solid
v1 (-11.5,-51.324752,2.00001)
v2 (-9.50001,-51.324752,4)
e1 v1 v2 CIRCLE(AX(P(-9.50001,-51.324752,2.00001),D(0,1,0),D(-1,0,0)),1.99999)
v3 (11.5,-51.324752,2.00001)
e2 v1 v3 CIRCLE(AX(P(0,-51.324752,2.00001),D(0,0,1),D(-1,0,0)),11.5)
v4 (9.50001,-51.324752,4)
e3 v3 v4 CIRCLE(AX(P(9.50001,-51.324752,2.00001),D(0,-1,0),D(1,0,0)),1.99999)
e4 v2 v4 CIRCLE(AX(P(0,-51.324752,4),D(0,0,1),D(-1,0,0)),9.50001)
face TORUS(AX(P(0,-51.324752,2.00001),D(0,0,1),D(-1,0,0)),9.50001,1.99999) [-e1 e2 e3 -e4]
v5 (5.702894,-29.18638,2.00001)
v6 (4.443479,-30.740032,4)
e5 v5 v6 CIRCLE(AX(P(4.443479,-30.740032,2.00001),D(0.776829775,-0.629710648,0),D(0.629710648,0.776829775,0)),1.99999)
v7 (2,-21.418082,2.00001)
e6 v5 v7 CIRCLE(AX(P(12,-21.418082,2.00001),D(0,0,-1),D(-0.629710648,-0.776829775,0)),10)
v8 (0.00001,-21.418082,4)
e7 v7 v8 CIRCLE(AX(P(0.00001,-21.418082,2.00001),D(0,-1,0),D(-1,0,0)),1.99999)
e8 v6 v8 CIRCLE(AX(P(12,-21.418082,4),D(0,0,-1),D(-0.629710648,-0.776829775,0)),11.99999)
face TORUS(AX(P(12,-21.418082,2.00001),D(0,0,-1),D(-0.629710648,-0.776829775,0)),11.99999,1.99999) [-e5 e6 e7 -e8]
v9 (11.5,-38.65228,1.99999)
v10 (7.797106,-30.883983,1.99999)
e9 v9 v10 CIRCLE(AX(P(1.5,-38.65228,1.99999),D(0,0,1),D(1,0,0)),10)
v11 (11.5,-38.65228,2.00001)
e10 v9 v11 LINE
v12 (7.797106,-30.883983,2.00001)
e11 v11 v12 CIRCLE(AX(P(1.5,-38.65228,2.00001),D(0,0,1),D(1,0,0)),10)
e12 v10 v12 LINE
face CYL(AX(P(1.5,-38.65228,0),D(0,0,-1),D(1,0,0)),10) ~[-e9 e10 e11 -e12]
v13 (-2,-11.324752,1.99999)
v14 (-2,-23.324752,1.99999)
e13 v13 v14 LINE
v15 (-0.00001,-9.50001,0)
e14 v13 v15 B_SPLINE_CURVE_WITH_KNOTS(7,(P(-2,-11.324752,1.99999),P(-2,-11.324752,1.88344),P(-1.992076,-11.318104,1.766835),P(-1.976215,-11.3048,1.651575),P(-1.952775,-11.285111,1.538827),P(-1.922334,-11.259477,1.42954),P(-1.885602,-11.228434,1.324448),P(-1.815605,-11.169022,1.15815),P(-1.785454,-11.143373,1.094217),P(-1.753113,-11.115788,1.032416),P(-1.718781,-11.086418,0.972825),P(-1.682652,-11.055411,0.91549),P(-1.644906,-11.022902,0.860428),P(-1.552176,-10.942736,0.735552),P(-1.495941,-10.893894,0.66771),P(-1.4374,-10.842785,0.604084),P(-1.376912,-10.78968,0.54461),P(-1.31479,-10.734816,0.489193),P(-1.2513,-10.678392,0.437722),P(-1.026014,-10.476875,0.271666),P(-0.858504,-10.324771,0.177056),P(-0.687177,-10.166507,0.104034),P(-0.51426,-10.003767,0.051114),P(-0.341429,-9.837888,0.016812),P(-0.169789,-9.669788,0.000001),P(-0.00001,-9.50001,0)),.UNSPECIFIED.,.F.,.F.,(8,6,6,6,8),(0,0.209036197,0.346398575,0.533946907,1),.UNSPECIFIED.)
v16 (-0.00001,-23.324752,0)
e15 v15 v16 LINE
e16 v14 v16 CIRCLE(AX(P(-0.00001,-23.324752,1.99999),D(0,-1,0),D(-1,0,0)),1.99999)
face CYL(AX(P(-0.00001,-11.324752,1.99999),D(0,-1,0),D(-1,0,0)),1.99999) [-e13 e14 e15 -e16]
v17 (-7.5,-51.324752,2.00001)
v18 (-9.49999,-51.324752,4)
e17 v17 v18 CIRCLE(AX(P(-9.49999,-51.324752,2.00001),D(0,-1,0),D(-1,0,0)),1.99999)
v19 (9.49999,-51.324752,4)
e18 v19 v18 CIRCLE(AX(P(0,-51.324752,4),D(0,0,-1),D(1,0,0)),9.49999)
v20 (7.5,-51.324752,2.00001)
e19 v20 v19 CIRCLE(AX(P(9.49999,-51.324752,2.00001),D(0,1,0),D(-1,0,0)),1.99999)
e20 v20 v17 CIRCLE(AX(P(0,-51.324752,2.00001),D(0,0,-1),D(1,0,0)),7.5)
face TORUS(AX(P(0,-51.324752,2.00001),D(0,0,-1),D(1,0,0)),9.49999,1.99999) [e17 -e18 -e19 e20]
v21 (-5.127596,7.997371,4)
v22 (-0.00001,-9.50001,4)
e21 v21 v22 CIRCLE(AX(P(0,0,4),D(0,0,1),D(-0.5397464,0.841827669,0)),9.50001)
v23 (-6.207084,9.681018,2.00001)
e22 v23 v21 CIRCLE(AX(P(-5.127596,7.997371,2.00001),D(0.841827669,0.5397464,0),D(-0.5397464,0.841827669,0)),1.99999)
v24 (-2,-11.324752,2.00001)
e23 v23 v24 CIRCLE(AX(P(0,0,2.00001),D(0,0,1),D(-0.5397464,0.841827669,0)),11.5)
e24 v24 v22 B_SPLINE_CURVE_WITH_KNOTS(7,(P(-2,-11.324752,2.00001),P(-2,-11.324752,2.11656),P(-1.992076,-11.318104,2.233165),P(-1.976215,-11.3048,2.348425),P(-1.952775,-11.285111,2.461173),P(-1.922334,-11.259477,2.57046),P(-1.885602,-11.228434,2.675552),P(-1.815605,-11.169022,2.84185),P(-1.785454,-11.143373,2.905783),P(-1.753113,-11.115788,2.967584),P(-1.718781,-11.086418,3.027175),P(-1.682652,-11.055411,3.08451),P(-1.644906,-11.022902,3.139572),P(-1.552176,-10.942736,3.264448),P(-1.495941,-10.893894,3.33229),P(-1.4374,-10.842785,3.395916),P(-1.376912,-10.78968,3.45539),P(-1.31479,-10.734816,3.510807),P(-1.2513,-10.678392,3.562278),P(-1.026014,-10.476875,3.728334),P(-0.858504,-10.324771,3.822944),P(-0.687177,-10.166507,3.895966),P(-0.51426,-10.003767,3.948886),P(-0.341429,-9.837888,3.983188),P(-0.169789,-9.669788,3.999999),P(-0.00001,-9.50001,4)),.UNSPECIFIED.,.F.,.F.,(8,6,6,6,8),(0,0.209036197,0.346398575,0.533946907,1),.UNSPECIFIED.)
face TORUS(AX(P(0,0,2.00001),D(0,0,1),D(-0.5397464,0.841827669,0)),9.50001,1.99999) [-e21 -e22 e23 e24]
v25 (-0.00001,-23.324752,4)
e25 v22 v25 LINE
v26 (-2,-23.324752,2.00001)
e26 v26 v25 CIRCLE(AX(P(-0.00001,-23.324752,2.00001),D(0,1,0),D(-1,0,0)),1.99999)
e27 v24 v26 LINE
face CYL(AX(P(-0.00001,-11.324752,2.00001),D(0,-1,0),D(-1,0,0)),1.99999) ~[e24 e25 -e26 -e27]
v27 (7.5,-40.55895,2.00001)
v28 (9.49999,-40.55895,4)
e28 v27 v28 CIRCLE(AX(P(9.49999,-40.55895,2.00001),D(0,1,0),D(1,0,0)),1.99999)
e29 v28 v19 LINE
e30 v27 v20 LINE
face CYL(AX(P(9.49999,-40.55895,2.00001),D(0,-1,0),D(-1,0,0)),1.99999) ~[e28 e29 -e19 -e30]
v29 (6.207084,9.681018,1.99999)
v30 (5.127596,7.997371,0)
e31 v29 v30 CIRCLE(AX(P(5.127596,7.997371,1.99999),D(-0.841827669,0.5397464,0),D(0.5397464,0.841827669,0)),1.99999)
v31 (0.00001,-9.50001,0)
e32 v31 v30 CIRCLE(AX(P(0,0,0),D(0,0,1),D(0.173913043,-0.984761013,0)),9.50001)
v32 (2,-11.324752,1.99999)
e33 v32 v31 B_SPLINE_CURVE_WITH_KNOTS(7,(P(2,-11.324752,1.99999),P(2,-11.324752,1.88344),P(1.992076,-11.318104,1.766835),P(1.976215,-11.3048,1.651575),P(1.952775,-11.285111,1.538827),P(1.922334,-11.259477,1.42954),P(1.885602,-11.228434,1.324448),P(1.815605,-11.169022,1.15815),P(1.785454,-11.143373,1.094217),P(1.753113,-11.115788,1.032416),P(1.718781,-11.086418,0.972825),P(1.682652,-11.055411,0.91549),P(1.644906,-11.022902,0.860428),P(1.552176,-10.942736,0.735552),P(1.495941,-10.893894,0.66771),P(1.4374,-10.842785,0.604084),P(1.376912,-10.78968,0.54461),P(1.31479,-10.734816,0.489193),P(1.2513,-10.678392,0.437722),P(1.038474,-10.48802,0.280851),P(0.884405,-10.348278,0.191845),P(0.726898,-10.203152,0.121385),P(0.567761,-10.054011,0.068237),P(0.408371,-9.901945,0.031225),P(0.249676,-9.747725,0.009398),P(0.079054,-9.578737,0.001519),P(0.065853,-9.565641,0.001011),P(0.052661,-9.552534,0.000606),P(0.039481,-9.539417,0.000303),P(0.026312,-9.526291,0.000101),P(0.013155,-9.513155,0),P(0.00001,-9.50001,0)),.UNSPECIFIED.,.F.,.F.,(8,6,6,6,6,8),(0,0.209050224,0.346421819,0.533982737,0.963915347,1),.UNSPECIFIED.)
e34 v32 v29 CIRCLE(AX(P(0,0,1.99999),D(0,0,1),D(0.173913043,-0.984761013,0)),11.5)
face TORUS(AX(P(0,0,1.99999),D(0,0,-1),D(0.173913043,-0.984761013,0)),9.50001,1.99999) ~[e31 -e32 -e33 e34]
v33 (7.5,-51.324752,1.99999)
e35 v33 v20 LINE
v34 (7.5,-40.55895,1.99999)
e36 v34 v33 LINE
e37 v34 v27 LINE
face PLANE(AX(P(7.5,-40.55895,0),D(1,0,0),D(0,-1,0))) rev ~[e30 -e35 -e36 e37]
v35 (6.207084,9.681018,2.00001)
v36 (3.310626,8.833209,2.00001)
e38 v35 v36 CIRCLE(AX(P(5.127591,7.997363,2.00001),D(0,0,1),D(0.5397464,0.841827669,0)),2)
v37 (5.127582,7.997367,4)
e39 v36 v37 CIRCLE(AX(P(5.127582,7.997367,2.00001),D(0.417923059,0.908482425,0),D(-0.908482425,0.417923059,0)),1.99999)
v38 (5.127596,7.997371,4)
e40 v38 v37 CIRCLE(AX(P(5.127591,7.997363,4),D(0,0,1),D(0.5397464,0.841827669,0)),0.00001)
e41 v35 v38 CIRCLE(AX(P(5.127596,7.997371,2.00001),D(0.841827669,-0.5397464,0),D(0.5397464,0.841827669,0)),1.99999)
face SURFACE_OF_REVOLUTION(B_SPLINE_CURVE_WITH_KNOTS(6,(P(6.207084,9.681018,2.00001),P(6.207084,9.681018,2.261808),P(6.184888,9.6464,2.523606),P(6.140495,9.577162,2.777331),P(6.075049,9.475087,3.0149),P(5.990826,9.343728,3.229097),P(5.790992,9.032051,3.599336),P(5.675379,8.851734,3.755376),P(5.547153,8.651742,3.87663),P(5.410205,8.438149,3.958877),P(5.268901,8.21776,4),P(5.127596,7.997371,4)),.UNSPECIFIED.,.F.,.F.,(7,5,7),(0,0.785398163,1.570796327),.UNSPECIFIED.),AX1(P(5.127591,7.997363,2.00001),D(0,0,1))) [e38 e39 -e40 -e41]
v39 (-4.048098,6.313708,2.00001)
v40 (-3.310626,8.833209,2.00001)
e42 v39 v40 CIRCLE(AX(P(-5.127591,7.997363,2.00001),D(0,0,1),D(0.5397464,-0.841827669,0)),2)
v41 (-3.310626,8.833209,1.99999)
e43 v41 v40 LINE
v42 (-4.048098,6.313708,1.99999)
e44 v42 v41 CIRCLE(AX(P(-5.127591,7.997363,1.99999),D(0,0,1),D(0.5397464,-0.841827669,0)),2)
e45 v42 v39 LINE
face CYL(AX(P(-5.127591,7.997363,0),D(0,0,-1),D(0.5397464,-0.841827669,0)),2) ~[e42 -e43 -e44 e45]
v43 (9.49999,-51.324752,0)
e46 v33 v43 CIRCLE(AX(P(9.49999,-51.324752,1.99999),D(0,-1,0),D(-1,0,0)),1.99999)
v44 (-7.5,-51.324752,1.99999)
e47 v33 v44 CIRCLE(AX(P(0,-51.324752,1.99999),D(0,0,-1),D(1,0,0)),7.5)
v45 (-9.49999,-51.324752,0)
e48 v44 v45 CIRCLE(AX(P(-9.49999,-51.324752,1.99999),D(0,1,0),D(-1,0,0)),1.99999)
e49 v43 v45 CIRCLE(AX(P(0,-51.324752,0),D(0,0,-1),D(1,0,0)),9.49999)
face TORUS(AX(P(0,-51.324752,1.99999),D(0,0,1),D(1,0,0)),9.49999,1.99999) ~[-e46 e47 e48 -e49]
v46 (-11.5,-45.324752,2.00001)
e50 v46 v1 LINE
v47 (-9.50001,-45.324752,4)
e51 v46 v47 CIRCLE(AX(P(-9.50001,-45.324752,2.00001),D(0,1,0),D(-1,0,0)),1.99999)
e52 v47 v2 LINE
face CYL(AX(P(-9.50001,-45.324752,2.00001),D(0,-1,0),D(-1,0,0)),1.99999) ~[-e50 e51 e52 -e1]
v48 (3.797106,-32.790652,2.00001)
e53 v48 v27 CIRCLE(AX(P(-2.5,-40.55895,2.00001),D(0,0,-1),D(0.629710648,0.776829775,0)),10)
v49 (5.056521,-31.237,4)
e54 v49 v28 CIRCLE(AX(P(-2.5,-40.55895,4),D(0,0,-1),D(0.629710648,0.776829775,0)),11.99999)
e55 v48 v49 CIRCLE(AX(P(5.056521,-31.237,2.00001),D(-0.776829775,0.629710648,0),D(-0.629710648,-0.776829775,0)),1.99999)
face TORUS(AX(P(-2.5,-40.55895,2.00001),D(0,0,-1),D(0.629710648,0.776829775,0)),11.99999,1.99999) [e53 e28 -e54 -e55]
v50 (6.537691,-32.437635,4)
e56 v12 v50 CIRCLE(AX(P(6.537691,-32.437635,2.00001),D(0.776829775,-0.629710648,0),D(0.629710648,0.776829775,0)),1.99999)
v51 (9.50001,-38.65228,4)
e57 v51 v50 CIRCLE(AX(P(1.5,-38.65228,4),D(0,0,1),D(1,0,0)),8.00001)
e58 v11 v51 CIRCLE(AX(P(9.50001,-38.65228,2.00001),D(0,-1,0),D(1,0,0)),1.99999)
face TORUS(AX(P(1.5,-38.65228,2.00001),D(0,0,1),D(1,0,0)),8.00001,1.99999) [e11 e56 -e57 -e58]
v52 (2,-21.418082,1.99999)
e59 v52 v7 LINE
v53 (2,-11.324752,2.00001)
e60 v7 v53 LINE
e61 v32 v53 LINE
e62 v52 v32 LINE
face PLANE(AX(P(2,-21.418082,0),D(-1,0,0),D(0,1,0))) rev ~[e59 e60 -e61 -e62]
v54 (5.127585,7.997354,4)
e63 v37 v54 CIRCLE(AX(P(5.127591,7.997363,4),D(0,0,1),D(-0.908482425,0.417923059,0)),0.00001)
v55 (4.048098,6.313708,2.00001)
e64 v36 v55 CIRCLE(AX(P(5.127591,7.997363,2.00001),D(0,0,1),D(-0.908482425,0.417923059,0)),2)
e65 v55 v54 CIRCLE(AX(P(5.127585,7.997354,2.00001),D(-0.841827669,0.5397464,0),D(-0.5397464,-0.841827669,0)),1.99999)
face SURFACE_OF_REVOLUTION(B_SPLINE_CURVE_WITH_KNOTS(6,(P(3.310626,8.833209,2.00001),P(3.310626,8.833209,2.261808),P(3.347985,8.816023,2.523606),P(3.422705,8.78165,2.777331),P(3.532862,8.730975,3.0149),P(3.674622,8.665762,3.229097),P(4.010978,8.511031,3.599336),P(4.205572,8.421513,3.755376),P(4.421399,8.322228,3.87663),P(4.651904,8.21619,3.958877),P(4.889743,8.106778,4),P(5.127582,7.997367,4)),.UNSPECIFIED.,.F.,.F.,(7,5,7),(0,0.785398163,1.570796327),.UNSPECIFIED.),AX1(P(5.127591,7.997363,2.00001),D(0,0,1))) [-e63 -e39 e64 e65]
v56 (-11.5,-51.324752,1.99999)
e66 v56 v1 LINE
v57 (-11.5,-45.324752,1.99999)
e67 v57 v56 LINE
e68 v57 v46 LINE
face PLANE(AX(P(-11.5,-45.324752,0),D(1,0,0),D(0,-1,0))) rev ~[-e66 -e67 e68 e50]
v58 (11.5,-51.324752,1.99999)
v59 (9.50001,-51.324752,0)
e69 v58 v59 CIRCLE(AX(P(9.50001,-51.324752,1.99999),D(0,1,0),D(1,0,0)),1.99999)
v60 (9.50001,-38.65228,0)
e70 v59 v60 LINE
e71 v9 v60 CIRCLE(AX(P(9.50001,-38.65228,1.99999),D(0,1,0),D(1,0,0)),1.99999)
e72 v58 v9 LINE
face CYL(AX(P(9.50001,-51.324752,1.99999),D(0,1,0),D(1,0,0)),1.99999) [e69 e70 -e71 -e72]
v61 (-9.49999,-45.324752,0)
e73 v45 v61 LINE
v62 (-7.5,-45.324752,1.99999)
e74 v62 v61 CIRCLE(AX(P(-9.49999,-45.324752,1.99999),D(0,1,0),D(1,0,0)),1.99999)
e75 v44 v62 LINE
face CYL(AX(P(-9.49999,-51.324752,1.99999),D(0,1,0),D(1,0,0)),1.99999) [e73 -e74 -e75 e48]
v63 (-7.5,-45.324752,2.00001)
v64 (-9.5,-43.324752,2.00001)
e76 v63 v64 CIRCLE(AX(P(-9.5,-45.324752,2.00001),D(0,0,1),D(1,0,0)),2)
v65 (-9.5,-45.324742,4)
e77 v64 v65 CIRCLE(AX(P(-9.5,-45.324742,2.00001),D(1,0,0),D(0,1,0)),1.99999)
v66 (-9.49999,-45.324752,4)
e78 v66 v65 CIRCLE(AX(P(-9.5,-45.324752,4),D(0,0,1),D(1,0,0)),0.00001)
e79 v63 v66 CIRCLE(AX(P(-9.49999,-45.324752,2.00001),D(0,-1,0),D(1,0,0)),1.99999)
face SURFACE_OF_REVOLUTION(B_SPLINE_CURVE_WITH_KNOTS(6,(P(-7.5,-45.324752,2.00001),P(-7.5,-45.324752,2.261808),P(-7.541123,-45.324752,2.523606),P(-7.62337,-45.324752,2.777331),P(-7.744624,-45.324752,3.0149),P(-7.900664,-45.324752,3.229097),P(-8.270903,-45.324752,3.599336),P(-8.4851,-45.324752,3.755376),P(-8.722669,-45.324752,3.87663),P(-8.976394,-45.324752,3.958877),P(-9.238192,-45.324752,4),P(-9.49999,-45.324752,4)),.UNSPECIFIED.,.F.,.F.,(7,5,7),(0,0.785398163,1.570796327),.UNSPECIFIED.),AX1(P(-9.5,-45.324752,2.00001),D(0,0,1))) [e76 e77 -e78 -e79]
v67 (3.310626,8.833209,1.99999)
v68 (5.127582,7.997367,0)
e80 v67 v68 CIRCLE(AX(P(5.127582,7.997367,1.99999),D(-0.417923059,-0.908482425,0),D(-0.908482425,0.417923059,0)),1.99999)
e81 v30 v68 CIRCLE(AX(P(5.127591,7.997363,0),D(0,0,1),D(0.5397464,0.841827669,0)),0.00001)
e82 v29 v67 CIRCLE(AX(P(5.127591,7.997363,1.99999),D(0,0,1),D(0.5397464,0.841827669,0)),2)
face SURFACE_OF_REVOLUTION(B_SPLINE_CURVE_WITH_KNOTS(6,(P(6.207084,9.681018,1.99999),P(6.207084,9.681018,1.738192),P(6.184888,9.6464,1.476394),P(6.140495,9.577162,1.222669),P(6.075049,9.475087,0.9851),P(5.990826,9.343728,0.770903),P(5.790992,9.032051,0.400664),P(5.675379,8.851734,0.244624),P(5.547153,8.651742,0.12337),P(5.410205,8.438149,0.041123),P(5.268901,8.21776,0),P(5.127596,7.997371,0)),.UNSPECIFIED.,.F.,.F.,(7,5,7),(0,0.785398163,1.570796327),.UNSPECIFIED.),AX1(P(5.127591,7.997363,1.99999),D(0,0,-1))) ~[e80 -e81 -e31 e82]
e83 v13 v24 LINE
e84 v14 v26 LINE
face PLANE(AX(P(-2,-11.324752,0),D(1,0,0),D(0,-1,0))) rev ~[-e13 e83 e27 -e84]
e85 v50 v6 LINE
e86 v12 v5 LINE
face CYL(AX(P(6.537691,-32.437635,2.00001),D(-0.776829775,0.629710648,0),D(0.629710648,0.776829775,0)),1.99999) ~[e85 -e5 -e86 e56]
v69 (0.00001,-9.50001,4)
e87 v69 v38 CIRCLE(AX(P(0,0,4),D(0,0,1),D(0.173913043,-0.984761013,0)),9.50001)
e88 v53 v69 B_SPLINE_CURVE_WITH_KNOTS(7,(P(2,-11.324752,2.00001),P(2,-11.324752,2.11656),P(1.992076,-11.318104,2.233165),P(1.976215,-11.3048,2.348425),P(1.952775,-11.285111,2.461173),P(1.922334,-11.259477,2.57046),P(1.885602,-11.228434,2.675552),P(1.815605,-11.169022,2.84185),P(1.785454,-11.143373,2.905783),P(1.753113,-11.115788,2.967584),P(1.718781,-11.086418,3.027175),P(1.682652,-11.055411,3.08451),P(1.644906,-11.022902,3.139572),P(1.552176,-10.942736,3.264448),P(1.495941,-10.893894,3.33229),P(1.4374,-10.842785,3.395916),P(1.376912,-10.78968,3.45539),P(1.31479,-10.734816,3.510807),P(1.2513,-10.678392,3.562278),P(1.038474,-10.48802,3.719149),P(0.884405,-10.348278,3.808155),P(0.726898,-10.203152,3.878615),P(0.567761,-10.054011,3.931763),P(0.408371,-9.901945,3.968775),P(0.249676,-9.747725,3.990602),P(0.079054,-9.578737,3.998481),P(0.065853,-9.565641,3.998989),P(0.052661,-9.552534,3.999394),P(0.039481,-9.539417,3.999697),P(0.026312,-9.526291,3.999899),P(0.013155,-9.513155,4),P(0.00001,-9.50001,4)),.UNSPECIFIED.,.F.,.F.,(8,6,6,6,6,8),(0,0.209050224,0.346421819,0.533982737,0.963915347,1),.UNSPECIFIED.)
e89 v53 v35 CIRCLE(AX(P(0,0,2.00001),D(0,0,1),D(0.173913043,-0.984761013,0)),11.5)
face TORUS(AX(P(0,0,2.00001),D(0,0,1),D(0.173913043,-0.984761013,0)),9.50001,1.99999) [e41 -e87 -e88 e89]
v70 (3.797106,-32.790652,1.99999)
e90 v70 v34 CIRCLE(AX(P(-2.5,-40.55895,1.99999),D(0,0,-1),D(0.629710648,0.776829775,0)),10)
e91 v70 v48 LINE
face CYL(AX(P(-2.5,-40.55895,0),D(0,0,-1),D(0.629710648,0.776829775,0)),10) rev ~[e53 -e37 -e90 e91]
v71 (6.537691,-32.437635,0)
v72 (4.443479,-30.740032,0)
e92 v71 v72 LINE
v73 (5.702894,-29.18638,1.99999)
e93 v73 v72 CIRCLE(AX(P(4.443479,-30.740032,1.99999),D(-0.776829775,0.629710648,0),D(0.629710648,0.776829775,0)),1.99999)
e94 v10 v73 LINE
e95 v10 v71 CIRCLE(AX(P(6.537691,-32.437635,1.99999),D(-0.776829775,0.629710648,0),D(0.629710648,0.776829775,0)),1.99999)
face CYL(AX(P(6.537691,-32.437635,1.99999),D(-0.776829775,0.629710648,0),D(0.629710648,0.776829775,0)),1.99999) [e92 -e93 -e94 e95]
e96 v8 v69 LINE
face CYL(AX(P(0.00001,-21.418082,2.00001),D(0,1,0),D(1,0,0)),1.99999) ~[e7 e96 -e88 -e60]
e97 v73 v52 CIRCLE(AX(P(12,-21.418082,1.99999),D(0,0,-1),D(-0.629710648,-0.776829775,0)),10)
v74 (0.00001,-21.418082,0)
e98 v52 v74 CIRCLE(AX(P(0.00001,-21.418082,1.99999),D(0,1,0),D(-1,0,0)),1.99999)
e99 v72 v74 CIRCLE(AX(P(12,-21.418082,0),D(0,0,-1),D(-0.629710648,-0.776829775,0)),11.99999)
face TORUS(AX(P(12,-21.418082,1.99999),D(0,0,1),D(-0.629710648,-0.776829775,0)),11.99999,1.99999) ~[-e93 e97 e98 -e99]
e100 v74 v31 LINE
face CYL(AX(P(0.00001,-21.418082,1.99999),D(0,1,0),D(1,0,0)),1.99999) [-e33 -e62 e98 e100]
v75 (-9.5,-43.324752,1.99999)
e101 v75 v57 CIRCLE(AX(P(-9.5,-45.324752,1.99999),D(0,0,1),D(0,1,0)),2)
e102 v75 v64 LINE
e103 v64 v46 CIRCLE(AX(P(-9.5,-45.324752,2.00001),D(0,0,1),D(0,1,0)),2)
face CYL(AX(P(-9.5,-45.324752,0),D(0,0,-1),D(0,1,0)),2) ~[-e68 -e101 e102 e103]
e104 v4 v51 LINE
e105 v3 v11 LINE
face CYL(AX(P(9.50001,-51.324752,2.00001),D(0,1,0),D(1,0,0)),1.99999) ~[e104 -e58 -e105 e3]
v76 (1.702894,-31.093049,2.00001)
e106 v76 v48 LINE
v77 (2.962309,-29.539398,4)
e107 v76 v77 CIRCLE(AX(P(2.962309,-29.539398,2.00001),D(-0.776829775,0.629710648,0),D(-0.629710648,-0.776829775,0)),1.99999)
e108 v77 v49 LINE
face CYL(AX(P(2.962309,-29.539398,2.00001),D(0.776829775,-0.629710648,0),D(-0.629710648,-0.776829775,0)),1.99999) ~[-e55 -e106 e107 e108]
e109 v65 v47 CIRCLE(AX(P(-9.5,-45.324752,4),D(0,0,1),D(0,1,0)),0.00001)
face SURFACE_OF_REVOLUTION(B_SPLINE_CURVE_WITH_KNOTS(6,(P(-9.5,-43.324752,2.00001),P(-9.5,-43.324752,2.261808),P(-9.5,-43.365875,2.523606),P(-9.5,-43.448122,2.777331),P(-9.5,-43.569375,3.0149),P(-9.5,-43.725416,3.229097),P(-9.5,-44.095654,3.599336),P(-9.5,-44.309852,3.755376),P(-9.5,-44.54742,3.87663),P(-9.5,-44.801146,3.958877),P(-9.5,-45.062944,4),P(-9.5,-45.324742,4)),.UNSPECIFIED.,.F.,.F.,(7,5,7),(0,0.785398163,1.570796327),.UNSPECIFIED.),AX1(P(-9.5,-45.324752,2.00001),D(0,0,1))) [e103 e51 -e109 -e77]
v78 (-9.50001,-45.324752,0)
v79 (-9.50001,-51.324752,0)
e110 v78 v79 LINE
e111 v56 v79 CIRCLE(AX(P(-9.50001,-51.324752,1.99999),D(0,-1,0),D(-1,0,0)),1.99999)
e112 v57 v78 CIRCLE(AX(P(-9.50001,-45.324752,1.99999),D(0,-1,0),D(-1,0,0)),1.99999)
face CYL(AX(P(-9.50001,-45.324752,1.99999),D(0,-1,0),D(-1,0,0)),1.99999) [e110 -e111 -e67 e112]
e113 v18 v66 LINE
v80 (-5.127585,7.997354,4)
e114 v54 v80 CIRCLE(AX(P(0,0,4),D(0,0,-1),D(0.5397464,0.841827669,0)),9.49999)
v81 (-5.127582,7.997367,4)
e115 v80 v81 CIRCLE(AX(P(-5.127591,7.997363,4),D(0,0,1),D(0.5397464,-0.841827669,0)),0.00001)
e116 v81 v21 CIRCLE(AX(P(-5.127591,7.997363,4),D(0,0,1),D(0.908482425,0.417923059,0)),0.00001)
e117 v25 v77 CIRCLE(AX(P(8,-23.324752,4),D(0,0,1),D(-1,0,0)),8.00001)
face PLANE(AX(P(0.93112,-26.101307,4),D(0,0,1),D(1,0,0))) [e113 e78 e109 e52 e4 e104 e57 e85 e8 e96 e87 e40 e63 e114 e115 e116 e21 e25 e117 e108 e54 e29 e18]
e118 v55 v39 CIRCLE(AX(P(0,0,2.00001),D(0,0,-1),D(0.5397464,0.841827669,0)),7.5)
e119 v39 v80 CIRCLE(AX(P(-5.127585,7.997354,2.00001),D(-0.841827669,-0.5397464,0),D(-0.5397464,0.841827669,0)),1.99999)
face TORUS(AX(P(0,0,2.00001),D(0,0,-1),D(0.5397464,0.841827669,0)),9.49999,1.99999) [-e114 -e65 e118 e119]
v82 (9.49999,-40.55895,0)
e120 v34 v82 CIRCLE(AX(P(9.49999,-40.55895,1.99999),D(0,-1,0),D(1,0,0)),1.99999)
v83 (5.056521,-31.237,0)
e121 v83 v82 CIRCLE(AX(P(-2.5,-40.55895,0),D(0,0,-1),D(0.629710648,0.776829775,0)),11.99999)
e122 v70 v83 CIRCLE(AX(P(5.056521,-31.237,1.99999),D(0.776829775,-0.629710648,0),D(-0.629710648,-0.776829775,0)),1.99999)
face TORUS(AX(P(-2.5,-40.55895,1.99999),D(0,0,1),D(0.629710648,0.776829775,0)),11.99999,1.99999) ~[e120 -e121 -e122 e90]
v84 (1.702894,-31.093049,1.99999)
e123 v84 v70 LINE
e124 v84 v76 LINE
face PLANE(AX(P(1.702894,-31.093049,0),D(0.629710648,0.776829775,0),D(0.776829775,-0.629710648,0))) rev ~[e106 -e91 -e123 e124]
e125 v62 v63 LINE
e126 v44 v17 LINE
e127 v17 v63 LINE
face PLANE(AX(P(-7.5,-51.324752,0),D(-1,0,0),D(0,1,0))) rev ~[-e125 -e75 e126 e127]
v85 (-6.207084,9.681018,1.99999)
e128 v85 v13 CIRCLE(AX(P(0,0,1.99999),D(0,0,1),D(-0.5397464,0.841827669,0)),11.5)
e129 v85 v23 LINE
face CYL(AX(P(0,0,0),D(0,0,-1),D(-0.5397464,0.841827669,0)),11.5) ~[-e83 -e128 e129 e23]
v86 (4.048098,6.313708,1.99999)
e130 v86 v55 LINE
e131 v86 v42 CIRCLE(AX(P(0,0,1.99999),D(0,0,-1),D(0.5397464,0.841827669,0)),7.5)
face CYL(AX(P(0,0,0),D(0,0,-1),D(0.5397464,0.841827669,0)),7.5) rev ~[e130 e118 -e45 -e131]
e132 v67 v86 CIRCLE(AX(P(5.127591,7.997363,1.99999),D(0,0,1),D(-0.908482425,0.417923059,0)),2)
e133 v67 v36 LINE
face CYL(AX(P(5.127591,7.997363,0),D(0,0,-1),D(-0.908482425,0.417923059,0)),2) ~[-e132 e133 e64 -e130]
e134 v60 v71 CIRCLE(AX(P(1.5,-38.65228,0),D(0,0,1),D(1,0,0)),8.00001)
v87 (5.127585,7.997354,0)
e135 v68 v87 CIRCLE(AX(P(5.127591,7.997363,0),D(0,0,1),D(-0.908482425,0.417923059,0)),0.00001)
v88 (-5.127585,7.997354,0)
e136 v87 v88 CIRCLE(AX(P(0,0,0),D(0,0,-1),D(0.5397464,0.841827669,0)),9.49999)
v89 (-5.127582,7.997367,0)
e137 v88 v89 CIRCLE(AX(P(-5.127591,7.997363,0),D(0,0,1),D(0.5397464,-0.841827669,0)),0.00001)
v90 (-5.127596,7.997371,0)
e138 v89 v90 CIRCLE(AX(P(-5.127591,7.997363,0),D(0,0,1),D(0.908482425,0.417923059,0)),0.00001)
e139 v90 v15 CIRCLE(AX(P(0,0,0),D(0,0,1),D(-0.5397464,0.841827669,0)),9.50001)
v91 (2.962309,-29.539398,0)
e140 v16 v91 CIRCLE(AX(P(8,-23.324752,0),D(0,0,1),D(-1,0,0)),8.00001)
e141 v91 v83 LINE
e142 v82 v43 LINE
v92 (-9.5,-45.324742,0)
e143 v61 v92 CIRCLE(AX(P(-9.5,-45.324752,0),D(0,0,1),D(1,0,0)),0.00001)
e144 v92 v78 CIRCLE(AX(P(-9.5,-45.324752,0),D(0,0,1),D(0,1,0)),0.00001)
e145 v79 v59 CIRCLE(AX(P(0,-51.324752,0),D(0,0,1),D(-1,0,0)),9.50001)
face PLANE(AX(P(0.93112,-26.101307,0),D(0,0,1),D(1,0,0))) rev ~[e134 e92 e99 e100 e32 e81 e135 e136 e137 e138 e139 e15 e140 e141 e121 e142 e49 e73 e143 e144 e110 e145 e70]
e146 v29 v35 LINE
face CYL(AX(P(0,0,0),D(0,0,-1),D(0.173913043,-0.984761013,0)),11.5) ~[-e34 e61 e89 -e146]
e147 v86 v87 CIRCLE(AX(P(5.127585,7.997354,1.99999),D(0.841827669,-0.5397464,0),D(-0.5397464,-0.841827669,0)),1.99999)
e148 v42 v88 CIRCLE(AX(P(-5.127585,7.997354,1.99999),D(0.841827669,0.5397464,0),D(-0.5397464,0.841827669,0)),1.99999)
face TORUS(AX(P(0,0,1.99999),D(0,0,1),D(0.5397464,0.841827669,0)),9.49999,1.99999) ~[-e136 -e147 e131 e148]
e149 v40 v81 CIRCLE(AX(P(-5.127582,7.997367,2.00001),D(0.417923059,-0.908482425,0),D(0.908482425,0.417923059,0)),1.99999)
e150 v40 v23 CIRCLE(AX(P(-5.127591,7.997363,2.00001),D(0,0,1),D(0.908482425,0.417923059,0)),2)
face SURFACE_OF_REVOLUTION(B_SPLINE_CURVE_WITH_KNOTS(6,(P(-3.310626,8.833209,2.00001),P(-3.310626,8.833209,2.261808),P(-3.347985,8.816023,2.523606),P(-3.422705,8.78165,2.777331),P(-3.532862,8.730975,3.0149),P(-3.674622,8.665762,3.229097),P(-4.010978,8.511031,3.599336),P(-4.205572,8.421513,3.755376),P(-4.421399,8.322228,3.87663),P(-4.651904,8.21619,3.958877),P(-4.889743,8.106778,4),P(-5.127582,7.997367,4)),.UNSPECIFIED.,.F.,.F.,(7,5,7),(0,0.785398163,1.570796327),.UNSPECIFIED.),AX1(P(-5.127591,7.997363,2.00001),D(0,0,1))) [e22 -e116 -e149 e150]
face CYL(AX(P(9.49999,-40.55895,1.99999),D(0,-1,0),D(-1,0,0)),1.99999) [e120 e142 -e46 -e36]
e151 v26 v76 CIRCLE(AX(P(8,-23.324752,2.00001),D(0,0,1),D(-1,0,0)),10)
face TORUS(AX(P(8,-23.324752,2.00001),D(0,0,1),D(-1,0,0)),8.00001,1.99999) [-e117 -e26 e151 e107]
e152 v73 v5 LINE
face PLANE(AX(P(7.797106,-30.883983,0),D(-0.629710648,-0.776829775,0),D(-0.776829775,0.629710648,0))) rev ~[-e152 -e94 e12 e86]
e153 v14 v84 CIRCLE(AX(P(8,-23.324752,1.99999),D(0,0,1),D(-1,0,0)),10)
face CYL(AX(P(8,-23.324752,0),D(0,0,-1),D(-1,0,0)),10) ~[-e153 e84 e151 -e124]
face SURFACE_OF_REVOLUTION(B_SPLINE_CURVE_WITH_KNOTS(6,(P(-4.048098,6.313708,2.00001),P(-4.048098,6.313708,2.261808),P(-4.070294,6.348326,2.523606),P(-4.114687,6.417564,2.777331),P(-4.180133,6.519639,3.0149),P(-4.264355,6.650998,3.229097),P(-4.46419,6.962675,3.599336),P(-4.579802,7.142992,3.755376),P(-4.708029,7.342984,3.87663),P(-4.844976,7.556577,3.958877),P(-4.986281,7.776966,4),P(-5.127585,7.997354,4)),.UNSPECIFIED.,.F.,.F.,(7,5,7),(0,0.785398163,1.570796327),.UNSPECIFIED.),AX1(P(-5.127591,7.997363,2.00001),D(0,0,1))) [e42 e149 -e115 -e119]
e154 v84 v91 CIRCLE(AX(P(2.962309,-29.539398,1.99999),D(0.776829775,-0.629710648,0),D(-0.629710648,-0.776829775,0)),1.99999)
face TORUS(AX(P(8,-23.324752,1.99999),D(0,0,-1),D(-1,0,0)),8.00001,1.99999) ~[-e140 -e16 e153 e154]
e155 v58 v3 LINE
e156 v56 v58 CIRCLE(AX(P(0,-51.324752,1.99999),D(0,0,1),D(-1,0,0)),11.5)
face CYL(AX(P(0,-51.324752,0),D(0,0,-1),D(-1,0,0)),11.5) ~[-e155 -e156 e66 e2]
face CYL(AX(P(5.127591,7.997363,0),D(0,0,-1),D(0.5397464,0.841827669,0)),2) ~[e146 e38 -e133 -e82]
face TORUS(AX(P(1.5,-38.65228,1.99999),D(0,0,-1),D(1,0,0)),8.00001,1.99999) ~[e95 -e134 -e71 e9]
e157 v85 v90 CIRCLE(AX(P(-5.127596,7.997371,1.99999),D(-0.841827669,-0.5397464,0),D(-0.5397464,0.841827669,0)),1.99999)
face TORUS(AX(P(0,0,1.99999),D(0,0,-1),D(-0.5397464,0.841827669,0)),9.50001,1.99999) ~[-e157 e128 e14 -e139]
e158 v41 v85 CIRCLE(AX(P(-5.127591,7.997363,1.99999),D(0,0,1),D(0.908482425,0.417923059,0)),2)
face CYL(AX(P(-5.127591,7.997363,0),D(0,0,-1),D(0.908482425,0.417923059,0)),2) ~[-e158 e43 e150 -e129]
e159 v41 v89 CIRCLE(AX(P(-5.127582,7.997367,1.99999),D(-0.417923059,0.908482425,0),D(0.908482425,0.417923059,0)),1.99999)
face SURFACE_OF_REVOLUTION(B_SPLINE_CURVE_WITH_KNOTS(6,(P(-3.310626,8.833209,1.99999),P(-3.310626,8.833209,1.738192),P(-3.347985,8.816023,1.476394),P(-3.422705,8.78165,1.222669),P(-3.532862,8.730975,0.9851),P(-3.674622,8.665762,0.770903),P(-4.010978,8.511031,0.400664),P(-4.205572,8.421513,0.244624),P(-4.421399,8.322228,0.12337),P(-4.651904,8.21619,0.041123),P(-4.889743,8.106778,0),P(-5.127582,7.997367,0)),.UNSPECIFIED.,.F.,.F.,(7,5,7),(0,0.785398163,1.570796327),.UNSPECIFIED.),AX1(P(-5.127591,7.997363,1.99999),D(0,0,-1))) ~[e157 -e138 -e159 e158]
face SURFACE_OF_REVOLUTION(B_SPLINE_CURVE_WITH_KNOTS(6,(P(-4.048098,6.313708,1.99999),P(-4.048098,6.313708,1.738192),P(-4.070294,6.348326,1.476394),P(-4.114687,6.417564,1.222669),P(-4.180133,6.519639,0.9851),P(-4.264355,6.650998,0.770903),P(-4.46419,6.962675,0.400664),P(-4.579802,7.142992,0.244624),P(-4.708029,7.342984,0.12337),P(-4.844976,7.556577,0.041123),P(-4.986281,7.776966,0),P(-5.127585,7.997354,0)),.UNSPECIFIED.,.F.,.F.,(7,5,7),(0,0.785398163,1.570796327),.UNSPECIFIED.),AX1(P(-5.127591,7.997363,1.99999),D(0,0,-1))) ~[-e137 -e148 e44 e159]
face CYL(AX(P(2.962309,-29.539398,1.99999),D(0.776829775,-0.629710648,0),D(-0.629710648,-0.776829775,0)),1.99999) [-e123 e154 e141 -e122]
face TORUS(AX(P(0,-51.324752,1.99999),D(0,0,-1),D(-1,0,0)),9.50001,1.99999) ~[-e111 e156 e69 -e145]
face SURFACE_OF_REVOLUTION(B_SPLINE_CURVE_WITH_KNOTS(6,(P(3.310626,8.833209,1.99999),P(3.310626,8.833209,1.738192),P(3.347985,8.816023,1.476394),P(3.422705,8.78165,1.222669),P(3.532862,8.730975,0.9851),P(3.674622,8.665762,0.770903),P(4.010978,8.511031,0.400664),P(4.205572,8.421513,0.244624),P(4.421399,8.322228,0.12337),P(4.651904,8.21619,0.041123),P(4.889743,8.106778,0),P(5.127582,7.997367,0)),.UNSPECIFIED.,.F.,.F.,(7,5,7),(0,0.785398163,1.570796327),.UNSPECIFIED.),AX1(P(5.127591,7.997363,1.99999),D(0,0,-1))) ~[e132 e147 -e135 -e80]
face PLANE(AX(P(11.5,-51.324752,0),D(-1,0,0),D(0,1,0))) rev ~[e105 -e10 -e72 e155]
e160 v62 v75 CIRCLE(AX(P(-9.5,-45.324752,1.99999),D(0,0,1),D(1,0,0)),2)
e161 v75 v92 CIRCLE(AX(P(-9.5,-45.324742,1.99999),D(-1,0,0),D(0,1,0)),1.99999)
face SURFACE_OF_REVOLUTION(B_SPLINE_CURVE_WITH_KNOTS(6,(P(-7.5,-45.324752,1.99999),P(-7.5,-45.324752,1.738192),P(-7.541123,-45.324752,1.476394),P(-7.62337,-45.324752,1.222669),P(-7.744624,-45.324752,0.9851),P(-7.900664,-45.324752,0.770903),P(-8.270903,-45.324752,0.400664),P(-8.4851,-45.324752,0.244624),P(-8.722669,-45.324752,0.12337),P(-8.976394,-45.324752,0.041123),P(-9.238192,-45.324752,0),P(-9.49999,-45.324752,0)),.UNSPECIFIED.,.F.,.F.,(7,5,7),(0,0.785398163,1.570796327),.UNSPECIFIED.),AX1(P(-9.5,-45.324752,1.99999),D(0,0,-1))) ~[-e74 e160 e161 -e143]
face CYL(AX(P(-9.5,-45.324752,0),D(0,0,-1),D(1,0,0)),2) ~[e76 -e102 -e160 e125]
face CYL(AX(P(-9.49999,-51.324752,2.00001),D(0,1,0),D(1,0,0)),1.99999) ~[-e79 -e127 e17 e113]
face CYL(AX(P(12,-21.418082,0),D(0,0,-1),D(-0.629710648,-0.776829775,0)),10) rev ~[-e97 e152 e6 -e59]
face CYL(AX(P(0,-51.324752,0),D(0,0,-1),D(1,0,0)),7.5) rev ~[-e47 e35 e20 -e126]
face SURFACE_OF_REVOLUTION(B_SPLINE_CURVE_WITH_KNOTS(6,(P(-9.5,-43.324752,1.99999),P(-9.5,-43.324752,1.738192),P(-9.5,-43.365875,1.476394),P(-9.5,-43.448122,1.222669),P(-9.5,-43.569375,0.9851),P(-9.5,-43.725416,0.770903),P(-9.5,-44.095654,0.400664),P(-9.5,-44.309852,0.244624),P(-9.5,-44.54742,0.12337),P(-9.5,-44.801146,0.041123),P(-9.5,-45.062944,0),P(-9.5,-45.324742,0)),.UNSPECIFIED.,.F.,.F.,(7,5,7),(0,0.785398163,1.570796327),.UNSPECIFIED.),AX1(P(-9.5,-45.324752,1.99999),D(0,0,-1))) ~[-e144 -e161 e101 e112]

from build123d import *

# Parameters (mm, degrees)
F1_DEPTH = 4
F2_R     = 1.99999


# Not quite as in the source:
# - a fillet or chamfer is up to 0.001 mm smaller than in the source, because OpenCascade refuses the exact size


with BuildPart() as f1:
    # F0 (on Top) → F1 (new body)
    with BuildSketch(Plane.XY):
        with BuildLine():
            ThreePointArc((4.0480979968, 6.3137075168), (0, -7.5), (-4.0480979968, 6.3137075168))
            ThreePointArc((-4.0480979968, 6.3137075168), (-3.2081276873, 7.4355253564), (-3.310625946, 8.8332089733))
            ThreePointArc((-3.310625946, 8.8332089733), (-4.5657532977, 9.9168259633), (-6.2070835951, 9.6810181925))
            ThreePointArc((-6.2070835951, 9.6810181925), (-11.2760652261, -2.2583961159), (-2, -11.3247516529))
            Line((-2, -11.3247516529), (-2, -23.3247516529))
            ThreePointArc((-2, -23.3247516529), (-1.0269337206, -27.6275957825), (1.7028935206, -31.0930494064))
            Line((1.7028935206, -31.0930494064), (3.7971064794, -32.7906519456))
            ThreePointArc((3.7971064794, -32.7906519456), (6.5269337206, -36.2561055696), (7.5, -40.5589496992))
            Line((7.5, -40.5589496992), (7.5, -51.3247516529))
            ThreePointArc((7.5, -51.3247516529), (0, -58.8247516529), (-7.5, -51.3247516529))
            Line((-7.5, -51.3247516529), (-7.5, -45.3247516529))
            ThreePointArc((-7.5, -45.3247516529), (-8.0857864376, -43.9105380905), (-9.5, -43.3247516529))
            ThreePointArc((-9.5, -43.3247516529), (-10.9142135624, -43.9105380905), (-11.5, -45.3247516529))
            Line((-11.5, -45.3247516529), (-11.5, -51.3247516529))
            ThreePointArc((-11.5, -51.3247516529), (0, -62.8247516529), (11.5, -51.3247516529))
            Line((11.5, -51.3247516529), (11.5, -38.6522804967))
            ThreePointArc((11.5, -38.6522804967), (10.5269337206, -34.3494363671), (7.7971064794, -30.8839827431))
            Line((7.7971064794, -30.8839827431), (5.7028935206, -29.1863802039))
            ThreePointArc((5.7028935206, -29.1863802039), (2.9730662794, -25.72092658), (2, -21.4180824504))
            Line((2, -21.4180824504), (2, -11.3247516529))
            ThreePointArc((2, -11.3247516529), (11.2760652261, -2.2583961159), (6.2070835951, 9.6810181925))
            ThreePointArc((6.2070835951, 9.6810181925), (4.5657532977, 9.9168259633), (3.310625946, 8.8332089733))
            ThreePointArc((3.310625946, 8.8332089733), (3.2081276873, 7.4355253564), (4.0480979968, 6.3137075168))
        make_face()
    extrude(amount=F1_DEPTH)

    # F2 (radius 2 in the source; OpenCascade refuses exactly that, so slightly less here)
    f2_edges = [f1.edges().sort_by_distance(p)[0] for p in [
        (-11.5, -48.324752, 4),
        (0, -62.824752, 4),
        (11.5, -44.988516, 4),
        (10.526934, -34.349436, 4),
        (6.75, -30.035181, 4),
        (2.973066, -25.720927, 4),
        (2, -16.371417, 4),
        (11.276065, -2.258396, 4),
        (3.443935, 9.076856, 4),
        (0, -7.5, 4),
        (-3.443935, 9.076856, 4),
        (-11.276065, -2.258396, 4),
        (-2, -17.324752, 4),
        (-1.026934, -27.627596, 4),
        (2.75, -31.941851, 4),
        (6.526934, -36.256106, 4),
        (7.5, -45.941851, 4),
        (0, -58.824752, 4),
        (-7.5, -48.324752, 4),
        (-9.5, -43.324752, 4),
        (-11.5, -48.324752, 0),
        (0, -62.824752, 0),
        (11.5, -44.988516, 0),
        (10.526934, -34.349436, 0),
        (6.75, -30.035181, 0),
        (2.973066, -25.720927, 0),
        (2, -16.371417, 0),
        (11.276065, -2.258396, 0),
        (3.443935, 9.076856, 0),
        (0, -7.5, 0),
        (-3.443935, 9.076856, 0),
        (-11.276065, -2.258396, 0),
        (-2, -17.324752, 0),
        (-1.026934, -27.627596, 0),
        (2.75, -31.941851, 0),
        (6.526934, -36.256106, 0),
        (7.5, -45.941851, 0),
        (0, -58.824752, 0),
        (-7.5, -48.324752, 0),
        (-9.5, -43.324752, 0),
    ]]
    fillet(f2_edges, radius=F2_R)


solid = f1.part
